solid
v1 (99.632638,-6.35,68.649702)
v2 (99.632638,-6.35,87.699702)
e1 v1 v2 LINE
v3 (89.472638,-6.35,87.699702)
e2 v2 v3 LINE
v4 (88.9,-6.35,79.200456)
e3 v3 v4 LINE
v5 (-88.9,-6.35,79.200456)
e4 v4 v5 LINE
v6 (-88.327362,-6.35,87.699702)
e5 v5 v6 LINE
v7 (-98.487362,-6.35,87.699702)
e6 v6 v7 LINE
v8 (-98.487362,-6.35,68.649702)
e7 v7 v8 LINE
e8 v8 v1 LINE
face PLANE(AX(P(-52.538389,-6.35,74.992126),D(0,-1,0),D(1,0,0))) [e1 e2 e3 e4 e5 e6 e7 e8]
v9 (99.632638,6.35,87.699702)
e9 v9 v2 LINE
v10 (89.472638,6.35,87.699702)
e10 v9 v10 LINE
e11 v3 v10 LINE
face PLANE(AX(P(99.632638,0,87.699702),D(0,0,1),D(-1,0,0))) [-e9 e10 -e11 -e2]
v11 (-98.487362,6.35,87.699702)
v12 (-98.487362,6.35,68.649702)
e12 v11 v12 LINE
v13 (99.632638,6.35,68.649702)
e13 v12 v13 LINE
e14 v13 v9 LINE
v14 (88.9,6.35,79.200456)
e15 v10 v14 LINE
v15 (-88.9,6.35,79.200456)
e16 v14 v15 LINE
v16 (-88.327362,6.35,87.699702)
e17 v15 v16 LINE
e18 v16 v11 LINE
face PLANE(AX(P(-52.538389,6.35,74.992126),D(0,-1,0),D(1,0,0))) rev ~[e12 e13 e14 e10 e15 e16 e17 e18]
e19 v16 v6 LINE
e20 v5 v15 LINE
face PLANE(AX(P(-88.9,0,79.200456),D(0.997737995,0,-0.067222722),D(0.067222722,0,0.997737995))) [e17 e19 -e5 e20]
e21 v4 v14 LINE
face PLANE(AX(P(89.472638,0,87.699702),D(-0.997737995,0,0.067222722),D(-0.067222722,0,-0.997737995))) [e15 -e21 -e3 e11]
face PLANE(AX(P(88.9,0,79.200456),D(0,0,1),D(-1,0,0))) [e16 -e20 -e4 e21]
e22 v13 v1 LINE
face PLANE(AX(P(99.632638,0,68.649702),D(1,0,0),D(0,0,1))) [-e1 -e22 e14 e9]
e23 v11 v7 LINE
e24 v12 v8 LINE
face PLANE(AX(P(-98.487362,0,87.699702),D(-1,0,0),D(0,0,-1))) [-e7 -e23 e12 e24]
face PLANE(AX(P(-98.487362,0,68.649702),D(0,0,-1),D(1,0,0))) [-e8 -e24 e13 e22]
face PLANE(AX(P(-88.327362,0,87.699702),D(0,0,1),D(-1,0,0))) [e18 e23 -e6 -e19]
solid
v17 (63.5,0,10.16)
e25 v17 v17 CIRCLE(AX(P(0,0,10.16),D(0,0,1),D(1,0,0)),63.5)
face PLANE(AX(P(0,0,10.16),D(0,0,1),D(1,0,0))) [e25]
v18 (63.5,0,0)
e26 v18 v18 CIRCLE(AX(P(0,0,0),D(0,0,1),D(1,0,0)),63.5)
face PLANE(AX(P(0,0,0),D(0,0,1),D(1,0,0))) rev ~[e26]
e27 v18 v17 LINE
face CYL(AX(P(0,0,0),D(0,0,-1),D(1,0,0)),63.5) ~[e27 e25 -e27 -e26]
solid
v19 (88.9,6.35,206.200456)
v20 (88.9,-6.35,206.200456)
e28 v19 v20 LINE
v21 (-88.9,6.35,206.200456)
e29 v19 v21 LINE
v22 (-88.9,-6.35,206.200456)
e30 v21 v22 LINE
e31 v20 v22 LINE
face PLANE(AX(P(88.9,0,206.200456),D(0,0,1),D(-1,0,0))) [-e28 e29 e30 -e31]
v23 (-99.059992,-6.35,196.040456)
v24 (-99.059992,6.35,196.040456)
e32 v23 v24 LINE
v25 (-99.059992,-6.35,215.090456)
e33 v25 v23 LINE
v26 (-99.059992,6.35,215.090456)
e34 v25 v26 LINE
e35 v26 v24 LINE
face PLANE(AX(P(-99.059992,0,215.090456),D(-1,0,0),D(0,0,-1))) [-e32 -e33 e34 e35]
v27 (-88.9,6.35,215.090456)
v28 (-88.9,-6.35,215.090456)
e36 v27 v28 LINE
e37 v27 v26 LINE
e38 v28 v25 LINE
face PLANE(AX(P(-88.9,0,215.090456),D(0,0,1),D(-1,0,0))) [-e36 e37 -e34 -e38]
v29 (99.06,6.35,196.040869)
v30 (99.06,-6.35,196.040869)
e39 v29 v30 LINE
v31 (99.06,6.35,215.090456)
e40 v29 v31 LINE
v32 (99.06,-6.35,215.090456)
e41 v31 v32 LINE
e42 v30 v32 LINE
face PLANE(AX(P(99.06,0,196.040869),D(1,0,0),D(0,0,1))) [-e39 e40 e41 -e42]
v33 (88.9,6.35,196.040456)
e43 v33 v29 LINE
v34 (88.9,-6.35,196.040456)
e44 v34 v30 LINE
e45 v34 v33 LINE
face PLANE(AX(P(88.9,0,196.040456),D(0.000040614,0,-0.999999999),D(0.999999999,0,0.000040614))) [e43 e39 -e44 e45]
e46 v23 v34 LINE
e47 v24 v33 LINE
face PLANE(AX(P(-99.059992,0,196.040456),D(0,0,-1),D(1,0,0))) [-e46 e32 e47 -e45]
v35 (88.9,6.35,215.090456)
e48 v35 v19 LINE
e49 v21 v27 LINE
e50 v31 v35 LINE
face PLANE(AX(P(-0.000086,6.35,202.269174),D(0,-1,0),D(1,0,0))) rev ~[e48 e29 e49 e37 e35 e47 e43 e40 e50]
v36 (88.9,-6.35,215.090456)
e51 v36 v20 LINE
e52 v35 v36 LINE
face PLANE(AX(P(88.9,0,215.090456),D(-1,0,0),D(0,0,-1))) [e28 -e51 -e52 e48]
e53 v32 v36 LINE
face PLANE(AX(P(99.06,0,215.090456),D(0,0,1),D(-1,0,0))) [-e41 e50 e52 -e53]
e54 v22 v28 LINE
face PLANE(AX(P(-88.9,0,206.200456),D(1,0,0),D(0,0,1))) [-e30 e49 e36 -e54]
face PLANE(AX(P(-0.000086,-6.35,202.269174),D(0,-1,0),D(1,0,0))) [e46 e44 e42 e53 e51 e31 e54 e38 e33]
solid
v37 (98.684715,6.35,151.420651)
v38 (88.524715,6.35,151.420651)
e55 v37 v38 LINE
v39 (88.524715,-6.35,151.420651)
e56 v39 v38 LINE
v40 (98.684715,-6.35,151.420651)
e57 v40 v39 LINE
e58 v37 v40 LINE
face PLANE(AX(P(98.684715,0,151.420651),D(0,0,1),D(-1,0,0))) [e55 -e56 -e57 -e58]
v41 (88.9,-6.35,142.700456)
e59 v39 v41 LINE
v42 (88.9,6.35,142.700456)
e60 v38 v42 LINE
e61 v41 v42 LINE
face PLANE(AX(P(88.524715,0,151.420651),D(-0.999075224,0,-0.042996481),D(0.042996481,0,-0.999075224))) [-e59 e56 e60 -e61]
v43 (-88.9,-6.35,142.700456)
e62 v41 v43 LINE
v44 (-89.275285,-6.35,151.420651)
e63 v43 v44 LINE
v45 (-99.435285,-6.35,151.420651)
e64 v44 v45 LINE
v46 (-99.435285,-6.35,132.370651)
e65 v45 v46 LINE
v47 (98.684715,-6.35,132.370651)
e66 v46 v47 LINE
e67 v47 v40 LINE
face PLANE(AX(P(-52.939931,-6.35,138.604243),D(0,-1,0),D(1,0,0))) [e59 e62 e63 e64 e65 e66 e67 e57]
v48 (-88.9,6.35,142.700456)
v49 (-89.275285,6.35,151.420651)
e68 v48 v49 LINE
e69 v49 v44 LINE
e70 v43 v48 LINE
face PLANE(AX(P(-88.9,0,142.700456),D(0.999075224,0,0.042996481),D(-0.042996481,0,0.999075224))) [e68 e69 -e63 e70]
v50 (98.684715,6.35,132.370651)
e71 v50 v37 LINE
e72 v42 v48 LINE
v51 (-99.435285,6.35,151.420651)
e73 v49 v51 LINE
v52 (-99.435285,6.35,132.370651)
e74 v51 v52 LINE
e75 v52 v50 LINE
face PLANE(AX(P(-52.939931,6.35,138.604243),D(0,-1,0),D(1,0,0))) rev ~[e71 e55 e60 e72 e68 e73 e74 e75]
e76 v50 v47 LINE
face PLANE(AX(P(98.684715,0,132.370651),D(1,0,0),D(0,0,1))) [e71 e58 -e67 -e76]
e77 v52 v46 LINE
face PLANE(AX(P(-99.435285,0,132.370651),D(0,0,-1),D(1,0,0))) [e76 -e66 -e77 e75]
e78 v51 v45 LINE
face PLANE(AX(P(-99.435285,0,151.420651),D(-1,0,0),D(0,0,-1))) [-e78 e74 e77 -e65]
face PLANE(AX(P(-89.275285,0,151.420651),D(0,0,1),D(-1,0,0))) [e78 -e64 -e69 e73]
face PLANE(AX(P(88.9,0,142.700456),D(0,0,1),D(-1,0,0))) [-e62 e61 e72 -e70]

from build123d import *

# Parameters (mm, degrees)
F0_R     = 63.5
F1_DEPTH = 10.16
F5_DEPTH = 6.35


# Not quite as in the source:
# - the program builds the solid bodies; features that only make, move or delete a surface that nothing else refers to are left out


with BuildPart() as f1:
    # F0 (on Top) → F1 (new body)
    with BuildSketch(Plane.XY):
        Circle(F0_R)
    extrude(amount=F1_DEPTH)


with BuildPart() as f5:
    # F4 (on Front) → F5 (new body, symmetric)
    with BuildSketch(Plane.XZ):
        Polygon((-88.3273622656, 68.6497017741), (0, 68.6497017741), (0, 74.1204561174), (0, 79.2004561174), (-88.9, 79.2004561174), (-88.3273622656, 87.6997017741), (-98.4873622656, 87.6997017741), (-98.4873622656, 68.6497017741), align=None)
        Polygon((0, 74.1204561174), (0, 68.6497017741), (0.5726377344, 68.6497017741), (89.4726377344, 68.6497017741), (99.6326377344, 68.6497017741), (99.6326377344, 87.6997017741), (89.4726377344, 87.6997017741), (88.9, 79.2004561174), (0, 79.2004561174), align=None)
    extrude(amount=F5_DEPTH, both=True)


with BuildPart() as f5b:
    # F4 (on Front) → F5, piece 2 (new body, symmetric)
    with BuildSketch(Plane.XZ):
        Polygon((-88.9, 196.0404561174), (0, 196.0404561174), (88.9, 196.0404561174), (99.06, 196.0408687592), (99.06, 215.0904561174), (88.9, 215.0904561174), (88.9, 206.2004561174), (0, 206.2004561174), (-88.9, 206.2004561174), (-88.9, 215.0904561174), (-99.0599915385, 215.0904561174), (-99.0599915385, 196.0404561174), align=None)
    extrude(amount=F5_DEPTH, both=True)


with BuildPart() as f5c:
    # F4 (on Front) → F5, piece 3 (new body, symmetric)
    with BuildSketch(Plane.XZ):
        Polygon((-0.3752847338, 132.3706507683), (0, 132.3706507683), (0, 137.6204561174), (0, 142.7004561174), (-88.9, 142.7004561174), (-89.2752847338, 151.4206507683), (-99.4352847338, 151.4206507683), (-99.4352847338, 132.3706507683), (-89.2752847338, 132.3706507683), align=None)
        Polygon((0, 137.6204561174), (0, 132.3706507683), (88.5247152662, 132.3706507683), (98.6847152662, 132.3706507683), (98.6847152662, 151.4206507683), (88.5247152662, 151.4206507683), (88.9, 142.7004561174), (0, 142.7004561174), align=None)
    extrude(amount=F5_DEPTH, both=True)


solid = Compound([f1.part, f5.part, f5b.part, f5c.part])
